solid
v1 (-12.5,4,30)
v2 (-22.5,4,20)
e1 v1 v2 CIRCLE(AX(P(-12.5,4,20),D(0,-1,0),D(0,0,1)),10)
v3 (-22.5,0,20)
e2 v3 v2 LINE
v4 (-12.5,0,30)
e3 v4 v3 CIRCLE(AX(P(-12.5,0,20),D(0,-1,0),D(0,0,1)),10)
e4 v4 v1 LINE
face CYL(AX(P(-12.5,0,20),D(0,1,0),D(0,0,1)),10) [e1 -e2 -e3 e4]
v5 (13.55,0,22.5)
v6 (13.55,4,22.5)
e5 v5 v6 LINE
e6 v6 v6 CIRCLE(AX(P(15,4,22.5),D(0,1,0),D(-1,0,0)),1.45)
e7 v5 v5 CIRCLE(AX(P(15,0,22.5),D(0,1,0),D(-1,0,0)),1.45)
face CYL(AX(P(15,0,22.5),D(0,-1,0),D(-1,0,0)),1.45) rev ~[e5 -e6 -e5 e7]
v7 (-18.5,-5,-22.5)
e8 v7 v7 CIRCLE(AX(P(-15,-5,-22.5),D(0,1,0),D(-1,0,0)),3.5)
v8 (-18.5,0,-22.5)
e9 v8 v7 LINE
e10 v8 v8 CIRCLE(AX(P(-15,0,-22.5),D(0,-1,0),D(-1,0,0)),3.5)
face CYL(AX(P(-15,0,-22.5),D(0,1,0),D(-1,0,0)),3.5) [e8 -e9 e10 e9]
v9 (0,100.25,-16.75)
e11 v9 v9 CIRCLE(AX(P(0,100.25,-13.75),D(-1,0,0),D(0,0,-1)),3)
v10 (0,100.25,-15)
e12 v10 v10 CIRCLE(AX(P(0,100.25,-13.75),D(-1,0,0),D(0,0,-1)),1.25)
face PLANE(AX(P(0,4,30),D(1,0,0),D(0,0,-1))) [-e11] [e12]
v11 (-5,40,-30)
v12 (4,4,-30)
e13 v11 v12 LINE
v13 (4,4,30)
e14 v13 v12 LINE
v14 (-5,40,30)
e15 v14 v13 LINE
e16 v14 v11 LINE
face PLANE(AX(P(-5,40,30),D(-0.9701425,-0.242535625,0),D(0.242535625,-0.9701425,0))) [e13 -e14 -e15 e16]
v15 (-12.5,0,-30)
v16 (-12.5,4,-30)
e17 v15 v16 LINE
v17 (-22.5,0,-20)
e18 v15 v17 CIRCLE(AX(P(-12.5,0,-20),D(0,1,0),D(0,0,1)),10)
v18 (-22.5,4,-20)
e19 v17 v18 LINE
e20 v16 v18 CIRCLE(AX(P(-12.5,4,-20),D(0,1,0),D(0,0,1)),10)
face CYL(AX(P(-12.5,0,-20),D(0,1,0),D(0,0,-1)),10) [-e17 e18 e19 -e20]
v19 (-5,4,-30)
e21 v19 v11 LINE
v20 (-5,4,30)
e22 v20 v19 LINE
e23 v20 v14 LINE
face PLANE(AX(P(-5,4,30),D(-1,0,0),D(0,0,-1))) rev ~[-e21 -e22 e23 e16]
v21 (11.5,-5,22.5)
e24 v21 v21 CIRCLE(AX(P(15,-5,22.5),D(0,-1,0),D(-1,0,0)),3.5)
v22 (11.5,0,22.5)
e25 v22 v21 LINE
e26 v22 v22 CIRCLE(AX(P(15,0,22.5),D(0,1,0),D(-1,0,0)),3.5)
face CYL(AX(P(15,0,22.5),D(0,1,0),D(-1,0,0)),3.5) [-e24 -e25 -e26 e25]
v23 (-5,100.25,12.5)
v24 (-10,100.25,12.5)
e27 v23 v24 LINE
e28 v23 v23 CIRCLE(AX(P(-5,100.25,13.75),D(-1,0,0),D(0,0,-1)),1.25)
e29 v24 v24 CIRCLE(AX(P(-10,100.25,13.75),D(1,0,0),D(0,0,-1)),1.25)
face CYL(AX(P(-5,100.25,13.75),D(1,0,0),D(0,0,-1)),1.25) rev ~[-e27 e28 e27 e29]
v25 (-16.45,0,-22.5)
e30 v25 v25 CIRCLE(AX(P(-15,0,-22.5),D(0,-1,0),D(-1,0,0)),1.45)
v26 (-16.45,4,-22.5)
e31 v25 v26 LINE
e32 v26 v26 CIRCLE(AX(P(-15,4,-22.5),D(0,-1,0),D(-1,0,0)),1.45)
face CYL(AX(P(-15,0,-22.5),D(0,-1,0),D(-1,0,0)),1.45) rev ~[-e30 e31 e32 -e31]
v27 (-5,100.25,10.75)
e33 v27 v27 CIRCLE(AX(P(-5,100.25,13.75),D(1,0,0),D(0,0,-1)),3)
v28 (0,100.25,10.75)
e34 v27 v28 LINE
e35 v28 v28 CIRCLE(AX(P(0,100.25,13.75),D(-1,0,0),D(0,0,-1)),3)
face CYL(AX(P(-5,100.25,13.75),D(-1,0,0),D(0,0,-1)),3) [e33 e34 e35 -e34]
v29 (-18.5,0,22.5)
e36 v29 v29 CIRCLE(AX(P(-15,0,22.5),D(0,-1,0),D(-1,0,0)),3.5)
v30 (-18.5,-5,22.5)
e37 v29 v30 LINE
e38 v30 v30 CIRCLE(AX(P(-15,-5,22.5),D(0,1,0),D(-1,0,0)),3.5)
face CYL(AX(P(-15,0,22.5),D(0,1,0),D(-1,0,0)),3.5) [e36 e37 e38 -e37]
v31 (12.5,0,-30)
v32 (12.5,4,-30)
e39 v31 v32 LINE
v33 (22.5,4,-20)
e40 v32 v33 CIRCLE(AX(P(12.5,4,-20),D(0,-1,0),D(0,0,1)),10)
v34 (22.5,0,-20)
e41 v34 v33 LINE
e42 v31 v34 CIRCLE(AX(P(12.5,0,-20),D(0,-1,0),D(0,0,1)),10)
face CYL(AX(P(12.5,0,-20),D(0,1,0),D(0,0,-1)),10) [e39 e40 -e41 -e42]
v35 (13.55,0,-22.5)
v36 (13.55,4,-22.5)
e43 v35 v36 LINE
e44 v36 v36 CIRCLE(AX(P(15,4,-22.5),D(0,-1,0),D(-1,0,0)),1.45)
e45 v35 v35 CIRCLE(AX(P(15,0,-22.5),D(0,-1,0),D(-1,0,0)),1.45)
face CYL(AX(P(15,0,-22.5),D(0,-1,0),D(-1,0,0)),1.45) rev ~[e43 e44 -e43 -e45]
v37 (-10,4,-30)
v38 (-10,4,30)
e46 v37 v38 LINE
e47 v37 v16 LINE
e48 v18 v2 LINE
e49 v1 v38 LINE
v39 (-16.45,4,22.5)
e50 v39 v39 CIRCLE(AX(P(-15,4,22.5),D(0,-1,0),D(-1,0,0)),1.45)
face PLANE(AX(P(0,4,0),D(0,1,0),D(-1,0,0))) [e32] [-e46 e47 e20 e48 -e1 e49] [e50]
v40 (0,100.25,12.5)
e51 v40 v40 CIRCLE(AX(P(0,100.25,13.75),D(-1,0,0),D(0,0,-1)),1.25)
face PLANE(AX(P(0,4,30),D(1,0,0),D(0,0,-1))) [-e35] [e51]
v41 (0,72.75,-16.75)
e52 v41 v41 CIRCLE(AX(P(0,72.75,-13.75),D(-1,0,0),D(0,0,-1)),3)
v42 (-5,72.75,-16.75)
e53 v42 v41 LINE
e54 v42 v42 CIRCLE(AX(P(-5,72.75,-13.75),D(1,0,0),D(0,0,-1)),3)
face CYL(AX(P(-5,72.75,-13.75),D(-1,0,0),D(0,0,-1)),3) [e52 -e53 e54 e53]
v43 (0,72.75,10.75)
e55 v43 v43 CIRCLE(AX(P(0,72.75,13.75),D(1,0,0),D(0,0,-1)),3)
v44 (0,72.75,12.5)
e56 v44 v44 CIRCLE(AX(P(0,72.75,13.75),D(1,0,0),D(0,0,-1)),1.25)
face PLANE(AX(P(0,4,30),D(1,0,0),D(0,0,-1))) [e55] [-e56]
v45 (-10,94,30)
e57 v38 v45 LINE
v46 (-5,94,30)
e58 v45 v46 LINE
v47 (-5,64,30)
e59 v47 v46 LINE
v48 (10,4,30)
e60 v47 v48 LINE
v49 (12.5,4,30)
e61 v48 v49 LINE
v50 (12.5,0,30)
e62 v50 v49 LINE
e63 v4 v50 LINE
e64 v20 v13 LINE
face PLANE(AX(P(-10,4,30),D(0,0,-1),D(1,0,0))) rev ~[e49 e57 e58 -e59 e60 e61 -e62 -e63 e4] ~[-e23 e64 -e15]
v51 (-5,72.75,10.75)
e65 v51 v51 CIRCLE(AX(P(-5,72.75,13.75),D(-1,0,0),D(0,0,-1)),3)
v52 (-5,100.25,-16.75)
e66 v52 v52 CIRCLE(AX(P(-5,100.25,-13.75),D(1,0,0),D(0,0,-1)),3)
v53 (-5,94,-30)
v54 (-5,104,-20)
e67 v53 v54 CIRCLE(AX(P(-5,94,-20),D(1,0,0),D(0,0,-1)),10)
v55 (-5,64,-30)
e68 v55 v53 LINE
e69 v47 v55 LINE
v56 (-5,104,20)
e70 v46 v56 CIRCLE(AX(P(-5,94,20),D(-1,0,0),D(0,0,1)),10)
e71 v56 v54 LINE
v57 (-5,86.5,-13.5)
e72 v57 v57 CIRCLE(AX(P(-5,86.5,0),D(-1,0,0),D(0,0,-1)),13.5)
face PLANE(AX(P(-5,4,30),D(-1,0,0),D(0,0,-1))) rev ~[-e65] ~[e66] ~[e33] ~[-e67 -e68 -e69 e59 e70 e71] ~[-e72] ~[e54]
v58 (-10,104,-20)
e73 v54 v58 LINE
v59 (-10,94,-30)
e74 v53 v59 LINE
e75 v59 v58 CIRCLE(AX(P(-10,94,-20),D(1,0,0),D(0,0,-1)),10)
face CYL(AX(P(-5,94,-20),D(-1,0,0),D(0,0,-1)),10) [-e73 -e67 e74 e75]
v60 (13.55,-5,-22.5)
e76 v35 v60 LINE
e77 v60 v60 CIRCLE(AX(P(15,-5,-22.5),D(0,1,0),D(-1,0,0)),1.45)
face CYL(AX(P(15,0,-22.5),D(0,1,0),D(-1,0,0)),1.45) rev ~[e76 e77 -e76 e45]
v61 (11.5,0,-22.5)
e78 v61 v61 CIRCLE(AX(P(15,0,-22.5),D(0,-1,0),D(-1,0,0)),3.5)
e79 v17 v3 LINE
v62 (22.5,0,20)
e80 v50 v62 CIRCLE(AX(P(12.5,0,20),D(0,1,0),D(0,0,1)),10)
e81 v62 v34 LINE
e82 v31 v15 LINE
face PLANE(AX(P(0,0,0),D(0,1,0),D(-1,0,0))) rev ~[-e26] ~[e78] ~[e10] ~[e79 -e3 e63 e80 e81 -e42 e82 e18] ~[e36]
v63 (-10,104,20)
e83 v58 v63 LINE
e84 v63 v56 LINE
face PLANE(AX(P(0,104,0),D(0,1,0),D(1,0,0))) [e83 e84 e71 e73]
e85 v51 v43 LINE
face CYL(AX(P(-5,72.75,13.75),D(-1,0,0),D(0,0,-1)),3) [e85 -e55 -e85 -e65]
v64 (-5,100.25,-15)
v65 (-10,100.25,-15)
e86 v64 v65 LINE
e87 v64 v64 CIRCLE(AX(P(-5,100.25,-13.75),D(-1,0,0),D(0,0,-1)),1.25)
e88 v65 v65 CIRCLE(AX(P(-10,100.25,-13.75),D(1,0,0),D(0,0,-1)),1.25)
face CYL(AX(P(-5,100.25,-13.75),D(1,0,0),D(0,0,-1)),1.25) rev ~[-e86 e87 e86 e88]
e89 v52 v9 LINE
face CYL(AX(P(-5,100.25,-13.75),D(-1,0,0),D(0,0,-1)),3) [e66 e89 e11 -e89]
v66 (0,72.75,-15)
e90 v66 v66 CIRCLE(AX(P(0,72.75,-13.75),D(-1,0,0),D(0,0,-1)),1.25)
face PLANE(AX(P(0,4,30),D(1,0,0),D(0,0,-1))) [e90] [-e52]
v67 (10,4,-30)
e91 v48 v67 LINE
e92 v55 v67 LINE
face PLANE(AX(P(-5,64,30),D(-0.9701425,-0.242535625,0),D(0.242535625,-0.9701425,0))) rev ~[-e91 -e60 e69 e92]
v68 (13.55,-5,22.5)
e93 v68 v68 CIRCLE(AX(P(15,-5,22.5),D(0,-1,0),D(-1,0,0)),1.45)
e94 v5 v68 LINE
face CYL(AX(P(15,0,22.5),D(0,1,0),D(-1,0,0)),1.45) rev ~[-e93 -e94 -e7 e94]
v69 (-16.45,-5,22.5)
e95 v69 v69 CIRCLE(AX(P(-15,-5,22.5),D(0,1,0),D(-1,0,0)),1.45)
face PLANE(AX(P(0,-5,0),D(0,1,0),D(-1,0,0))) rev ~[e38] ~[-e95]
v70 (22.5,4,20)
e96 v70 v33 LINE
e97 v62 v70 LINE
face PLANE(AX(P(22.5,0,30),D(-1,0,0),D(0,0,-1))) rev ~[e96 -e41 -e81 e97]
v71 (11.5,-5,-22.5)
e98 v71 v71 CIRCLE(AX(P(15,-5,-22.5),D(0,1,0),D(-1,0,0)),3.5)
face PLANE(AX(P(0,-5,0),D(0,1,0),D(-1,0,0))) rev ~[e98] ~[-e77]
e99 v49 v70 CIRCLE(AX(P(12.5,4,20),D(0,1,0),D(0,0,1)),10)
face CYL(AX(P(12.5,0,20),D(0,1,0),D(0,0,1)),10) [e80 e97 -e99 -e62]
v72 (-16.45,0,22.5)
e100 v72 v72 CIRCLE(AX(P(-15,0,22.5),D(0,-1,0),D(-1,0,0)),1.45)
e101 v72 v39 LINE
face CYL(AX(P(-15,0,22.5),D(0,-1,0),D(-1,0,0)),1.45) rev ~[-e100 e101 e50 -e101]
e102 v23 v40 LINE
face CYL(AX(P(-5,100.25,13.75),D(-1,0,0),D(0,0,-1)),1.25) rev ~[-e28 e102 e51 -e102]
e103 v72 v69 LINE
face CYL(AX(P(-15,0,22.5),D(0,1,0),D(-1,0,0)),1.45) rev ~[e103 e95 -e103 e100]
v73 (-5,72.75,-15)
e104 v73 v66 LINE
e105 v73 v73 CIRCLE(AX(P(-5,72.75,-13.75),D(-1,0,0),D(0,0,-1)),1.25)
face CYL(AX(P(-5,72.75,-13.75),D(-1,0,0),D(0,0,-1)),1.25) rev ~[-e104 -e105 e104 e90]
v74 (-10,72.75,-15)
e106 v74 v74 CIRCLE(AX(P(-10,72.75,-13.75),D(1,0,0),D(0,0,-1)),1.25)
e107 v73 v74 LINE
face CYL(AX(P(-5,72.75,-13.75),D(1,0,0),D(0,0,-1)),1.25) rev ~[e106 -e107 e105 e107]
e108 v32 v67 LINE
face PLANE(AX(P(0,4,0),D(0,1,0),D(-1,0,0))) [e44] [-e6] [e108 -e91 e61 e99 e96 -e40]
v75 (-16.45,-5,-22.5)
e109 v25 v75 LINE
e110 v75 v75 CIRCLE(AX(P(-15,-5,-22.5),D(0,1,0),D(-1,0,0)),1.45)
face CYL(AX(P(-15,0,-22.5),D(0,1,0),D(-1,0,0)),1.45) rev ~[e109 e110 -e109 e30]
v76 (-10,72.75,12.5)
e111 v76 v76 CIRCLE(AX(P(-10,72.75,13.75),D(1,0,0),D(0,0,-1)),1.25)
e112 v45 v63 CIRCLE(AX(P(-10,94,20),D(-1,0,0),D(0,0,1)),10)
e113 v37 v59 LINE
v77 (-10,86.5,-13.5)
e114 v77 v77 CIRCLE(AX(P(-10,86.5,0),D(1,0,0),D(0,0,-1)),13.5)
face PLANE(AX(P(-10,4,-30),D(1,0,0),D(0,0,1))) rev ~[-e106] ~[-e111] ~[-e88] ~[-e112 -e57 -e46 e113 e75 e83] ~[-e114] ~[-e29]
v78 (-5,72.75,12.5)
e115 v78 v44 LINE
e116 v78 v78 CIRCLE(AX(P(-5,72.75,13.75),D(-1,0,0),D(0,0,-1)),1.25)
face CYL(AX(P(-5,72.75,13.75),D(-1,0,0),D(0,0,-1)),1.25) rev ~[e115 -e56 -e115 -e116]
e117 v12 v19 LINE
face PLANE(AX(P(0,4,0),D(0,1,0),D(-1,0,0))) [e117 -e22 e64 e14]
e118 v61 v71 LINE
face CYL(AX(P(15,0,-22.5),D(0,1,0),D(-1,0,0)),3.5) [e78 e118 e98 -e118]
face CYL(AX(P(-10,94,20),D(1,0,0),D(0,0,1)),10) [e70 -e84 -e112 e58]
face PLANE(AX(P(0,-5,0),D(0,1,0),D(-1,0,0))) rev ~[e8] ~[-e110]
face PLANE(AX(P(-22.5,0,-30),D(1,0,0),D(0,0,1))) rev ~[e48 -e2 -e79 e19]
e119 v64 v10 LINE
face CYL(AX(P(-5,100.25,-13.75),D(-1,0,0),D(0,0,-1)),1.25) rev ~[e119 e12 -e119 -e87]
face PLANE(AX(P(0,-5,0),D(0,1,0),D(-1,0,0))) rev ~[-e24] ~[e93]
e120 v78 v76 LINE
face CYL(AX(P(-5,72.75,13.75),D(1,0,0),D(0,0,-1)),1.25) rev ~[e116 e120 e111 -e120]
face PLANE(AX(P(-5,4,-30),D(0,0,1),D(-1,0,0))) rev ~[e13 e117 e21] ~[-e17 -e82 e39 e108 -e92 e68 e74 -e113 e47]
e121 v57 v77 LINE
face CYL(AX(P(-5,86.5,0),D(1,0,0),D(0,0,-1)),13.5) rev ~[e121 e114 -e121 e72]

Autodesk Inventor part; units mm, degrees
ref_plane "YZ Plane" through (0, 0, 0) normal (1, 0, 0) x (0, 1, 0)
ref_plane "XZ Plane" through (0, 0, 0) normal (0, 1, 0) x (-1, 0, 0)
ref_plane "XY Plane" through (0, 0, 0) normal (0, 0, 1) x (1, 0, 0)
sketch "Sketch1" plane through (0, 0, 0) normal (0, 1, 0) x (-1, 0, 0)
  line L0 (-15, 22.5) -> (15, 22.5)
  line L1 (15, 22.5) -> (15, -22.5)
  line L2 (15, -22.5) -> (-15, -22.5)
  line L3 (-15, -22.5) -> (-15, 22.5)
  line L4 (-15, 22.5) -> (15, -22.5) construction
  line L5 (15, 22.5) -> (-15, -22.5) construction
  circle A0 centre (15, 22.5) radius 3.5
  circle A1 centre (-15, 22.5) radius 3.5
  circle A2 centre (15, -22.5) radius 3.5
  circle A3 centre (-15, -22.5) radius 3.5
  line L6 (22.5, 30) -> (-22.5, 30)
  line L7 (-22.5, 30) -> (-22.5, -30)
  line L8 (-22.5, -30) -> (22.5, -30)
  line L9 (22.5, -30) -> (22.5, 30)
  line L10 (22.5, 30) -> (-22.5, -30) construction
  line L11 (-22.5, 30) -> (22.5, -30) construction
  circle A4 centre (15, 22.5) radius 1.45
  circle A5 centre (15, -22.5) radius 1.45
  circle A6 centre (-15, 22.5) radius 1.45
  circle A7 centre (-15, -22.5) radius 1.45
  point P0 (0, 0)
  point P1 (-11.5, 22.5)
  point P2 (-15, 19)
  point P3 (-15, -19)
  point P4 (-11.5, -22.5)
  point P5 (11.5, -22.5)
  point P6 (15, -19)
  point P7 (15, 19)
  point P8 (11.5, 22.5)
  dimension "d0" = 45
  dimension "d1" = 30
  dimension "d2" = 7
  dimension "d3" = 7
  dimension "d4" = 7
  dimension "d5" = 7
  dimension "d6" = 7.5
  dimension "d7" = 7.5
  dimension "d8" = 2.9
  dimension "d9" = 2.9
  dimension "d10" = 2.9
  dimension "d11" = 2.9
extrude "Extrusion1" add sketch "Sketch1" against normal blind 5 contours A6 L3 A1 L0 | L0 A1 L3 A6 | A0 L1 A4 L0 | L0 A4 L1 A0 | A3 L2 A7 L3 | L3 A7 L2 A3 | A2 L2 A5 L1 | L1 A5 L2 A2
extrude "Extrusion2" add sketch "Sketch1" along normal blind 4 contours A6 L3 A1 L0 | L0 A1 L3 A6 | L0 A0 L1 A2 L2 A3 L3 A1 | A0 L1 A4 L0 | L0 A4 L1 A0 | A3 L2 A7 L3 | L3 A7 L2 A3 | A2 L2 A5 L1 | L1 A5 L2 A2 | L9 L8 L7 L6
sketch "Sketch2" plane through (0, 4, 0) normal (0, 1, 0) x (1, 0, 0)
  line L0 (-10, -30) -> (-5, -30)
  line L1 (-5, -30) -> (-5, 30)
  line L2 (-5, 30) -> (-10, 30)
  line L3 (-10, 30) -> (-10, -30)
  line L4 (-10, -30) -> (-5, 30) construction
  line L5 (-5, -30) -> (-10, 30) construction
  point P0 (0, 0)
  point P1 (-7.5, 0)
  dimension "d39" = 60
  dimension "d40" = 5
  dimension "d41" = 5
extrude "Extrusion3" add sketch "Sketch2" along normal blind 100
sketch "Sketch3" plane through (-5, 4, 30) normal (1, 0, 0) x (0, 0, -1)
  line L0 (30, 100) -> (30, 82.5)
  line L1 (16.25, 68.75) -> (43.75, 68.75)
  line L2 (43.75, 68.75) -> (43.75, 96.25)
  line L3 (43.75, 96.25) -> (16.25, 96.25)
  line L4 (16.25, 96.25) -> (16.25, 68.75)
  line L5 (16.25, 68.75) -> (43.75, 96.25) construction
  line L6 (43.75, 68.75) -> (16.25, 96.25) construction
  circle A0 centre (16.25, 96.25) radius 1.25
  circle A1 centre (43.75, 96.25) radius 1.25
  circle A2 centre (16.25, 68.75) radius 1.25
  circle A3 centre (43.75, 68.75) radius 1.25
  circle A4 centre (30, 82.5) radius 13.5
  circle A5 centre (16.25, 96.25) radius 3
  circle A6 centre (43.75, 96.25) radius 3
  circle A7 centre (16.25, 68.75) radius 3
  circle A8 centre (43.75, 68.75) radius 3
  line L7 (0, 100) -> (60, 100) projected
  line L8 (60, 0) -> (60, 100) projected
  point P0 (30, -4)
  dimension "d19" = 27.5
  dimension "d20" = 27.5
  dimension "d21" = 2.5
  dimension "d22" = 2.5
  dimension "d23" = 2.5
  dimension "d24" = 2.5
  dimension "d26" = 27
  dimension "d27" = 6
  dimension "d28" = 6
  dimension "d29" = 6
  dimension "d30" = 6
  dimension "d42" = 17.5
  dimension "d53" = 30
extrude "Extrusion4" cut sketch "Sketch3" against normal blind 60 contours L4 A2 L1 | L1 A2 L4 | A3 L2 L1 | L1 L2 A3 | A0 L3 L4 | L4 L3 A0 | A1 L3 L2 | L2 L3 A1 | A4
extrude "Extrusion5" add sketch "Sketch3" along normal blind 5 contours A2 L4 A7 L1 | L1 A7 L4 A2 | A8 L2 A3 L1 | L1 A3 L2 A8 | A5 L3 A0 L4 | L4 A0 L3 A5 | A6 L3 A1 L2 | L2 A1 L3 A6
fillet "Fillet1" radius 10 2 edges at (-7.5, 104, -30) (-7.5, 104, 30)
sketch "Sketch6" plane through (-10, 4, 30) normal (0, 0, 1) x (-1, 0, 0)
  line L0 (-5, 0) -> (-5, -90) projected
  line L1 (-5, -60) -> (-20, 0)
  line L2 (12.5, 0) -> (-32.5, 0) projected
  line L3 (-5, -36) -> (-14, 0)
  line L4 (-32.5, 0) -> (12.5, 0) projected
  line L5 (12.5, 4) -> (-32.5, 4) projected
  point P0 (-10, 4)
  point P1 (-10, 0)
  dimension "d50" = 40
  dimension "d52" = 15
  dimension "d54" = 60
extrude "Extrusion7" add sketch "Sketch6" against normal up to surface (60 mm away) contours L0 L1 L2 L3
fillet "Fillet2" radius 10 4 edges at (22.5, 2, 30) (-22.5, 2, 30) (22.5, 2, -30) (-22.5, 2, -30)
properties part number "Camera_holder"
